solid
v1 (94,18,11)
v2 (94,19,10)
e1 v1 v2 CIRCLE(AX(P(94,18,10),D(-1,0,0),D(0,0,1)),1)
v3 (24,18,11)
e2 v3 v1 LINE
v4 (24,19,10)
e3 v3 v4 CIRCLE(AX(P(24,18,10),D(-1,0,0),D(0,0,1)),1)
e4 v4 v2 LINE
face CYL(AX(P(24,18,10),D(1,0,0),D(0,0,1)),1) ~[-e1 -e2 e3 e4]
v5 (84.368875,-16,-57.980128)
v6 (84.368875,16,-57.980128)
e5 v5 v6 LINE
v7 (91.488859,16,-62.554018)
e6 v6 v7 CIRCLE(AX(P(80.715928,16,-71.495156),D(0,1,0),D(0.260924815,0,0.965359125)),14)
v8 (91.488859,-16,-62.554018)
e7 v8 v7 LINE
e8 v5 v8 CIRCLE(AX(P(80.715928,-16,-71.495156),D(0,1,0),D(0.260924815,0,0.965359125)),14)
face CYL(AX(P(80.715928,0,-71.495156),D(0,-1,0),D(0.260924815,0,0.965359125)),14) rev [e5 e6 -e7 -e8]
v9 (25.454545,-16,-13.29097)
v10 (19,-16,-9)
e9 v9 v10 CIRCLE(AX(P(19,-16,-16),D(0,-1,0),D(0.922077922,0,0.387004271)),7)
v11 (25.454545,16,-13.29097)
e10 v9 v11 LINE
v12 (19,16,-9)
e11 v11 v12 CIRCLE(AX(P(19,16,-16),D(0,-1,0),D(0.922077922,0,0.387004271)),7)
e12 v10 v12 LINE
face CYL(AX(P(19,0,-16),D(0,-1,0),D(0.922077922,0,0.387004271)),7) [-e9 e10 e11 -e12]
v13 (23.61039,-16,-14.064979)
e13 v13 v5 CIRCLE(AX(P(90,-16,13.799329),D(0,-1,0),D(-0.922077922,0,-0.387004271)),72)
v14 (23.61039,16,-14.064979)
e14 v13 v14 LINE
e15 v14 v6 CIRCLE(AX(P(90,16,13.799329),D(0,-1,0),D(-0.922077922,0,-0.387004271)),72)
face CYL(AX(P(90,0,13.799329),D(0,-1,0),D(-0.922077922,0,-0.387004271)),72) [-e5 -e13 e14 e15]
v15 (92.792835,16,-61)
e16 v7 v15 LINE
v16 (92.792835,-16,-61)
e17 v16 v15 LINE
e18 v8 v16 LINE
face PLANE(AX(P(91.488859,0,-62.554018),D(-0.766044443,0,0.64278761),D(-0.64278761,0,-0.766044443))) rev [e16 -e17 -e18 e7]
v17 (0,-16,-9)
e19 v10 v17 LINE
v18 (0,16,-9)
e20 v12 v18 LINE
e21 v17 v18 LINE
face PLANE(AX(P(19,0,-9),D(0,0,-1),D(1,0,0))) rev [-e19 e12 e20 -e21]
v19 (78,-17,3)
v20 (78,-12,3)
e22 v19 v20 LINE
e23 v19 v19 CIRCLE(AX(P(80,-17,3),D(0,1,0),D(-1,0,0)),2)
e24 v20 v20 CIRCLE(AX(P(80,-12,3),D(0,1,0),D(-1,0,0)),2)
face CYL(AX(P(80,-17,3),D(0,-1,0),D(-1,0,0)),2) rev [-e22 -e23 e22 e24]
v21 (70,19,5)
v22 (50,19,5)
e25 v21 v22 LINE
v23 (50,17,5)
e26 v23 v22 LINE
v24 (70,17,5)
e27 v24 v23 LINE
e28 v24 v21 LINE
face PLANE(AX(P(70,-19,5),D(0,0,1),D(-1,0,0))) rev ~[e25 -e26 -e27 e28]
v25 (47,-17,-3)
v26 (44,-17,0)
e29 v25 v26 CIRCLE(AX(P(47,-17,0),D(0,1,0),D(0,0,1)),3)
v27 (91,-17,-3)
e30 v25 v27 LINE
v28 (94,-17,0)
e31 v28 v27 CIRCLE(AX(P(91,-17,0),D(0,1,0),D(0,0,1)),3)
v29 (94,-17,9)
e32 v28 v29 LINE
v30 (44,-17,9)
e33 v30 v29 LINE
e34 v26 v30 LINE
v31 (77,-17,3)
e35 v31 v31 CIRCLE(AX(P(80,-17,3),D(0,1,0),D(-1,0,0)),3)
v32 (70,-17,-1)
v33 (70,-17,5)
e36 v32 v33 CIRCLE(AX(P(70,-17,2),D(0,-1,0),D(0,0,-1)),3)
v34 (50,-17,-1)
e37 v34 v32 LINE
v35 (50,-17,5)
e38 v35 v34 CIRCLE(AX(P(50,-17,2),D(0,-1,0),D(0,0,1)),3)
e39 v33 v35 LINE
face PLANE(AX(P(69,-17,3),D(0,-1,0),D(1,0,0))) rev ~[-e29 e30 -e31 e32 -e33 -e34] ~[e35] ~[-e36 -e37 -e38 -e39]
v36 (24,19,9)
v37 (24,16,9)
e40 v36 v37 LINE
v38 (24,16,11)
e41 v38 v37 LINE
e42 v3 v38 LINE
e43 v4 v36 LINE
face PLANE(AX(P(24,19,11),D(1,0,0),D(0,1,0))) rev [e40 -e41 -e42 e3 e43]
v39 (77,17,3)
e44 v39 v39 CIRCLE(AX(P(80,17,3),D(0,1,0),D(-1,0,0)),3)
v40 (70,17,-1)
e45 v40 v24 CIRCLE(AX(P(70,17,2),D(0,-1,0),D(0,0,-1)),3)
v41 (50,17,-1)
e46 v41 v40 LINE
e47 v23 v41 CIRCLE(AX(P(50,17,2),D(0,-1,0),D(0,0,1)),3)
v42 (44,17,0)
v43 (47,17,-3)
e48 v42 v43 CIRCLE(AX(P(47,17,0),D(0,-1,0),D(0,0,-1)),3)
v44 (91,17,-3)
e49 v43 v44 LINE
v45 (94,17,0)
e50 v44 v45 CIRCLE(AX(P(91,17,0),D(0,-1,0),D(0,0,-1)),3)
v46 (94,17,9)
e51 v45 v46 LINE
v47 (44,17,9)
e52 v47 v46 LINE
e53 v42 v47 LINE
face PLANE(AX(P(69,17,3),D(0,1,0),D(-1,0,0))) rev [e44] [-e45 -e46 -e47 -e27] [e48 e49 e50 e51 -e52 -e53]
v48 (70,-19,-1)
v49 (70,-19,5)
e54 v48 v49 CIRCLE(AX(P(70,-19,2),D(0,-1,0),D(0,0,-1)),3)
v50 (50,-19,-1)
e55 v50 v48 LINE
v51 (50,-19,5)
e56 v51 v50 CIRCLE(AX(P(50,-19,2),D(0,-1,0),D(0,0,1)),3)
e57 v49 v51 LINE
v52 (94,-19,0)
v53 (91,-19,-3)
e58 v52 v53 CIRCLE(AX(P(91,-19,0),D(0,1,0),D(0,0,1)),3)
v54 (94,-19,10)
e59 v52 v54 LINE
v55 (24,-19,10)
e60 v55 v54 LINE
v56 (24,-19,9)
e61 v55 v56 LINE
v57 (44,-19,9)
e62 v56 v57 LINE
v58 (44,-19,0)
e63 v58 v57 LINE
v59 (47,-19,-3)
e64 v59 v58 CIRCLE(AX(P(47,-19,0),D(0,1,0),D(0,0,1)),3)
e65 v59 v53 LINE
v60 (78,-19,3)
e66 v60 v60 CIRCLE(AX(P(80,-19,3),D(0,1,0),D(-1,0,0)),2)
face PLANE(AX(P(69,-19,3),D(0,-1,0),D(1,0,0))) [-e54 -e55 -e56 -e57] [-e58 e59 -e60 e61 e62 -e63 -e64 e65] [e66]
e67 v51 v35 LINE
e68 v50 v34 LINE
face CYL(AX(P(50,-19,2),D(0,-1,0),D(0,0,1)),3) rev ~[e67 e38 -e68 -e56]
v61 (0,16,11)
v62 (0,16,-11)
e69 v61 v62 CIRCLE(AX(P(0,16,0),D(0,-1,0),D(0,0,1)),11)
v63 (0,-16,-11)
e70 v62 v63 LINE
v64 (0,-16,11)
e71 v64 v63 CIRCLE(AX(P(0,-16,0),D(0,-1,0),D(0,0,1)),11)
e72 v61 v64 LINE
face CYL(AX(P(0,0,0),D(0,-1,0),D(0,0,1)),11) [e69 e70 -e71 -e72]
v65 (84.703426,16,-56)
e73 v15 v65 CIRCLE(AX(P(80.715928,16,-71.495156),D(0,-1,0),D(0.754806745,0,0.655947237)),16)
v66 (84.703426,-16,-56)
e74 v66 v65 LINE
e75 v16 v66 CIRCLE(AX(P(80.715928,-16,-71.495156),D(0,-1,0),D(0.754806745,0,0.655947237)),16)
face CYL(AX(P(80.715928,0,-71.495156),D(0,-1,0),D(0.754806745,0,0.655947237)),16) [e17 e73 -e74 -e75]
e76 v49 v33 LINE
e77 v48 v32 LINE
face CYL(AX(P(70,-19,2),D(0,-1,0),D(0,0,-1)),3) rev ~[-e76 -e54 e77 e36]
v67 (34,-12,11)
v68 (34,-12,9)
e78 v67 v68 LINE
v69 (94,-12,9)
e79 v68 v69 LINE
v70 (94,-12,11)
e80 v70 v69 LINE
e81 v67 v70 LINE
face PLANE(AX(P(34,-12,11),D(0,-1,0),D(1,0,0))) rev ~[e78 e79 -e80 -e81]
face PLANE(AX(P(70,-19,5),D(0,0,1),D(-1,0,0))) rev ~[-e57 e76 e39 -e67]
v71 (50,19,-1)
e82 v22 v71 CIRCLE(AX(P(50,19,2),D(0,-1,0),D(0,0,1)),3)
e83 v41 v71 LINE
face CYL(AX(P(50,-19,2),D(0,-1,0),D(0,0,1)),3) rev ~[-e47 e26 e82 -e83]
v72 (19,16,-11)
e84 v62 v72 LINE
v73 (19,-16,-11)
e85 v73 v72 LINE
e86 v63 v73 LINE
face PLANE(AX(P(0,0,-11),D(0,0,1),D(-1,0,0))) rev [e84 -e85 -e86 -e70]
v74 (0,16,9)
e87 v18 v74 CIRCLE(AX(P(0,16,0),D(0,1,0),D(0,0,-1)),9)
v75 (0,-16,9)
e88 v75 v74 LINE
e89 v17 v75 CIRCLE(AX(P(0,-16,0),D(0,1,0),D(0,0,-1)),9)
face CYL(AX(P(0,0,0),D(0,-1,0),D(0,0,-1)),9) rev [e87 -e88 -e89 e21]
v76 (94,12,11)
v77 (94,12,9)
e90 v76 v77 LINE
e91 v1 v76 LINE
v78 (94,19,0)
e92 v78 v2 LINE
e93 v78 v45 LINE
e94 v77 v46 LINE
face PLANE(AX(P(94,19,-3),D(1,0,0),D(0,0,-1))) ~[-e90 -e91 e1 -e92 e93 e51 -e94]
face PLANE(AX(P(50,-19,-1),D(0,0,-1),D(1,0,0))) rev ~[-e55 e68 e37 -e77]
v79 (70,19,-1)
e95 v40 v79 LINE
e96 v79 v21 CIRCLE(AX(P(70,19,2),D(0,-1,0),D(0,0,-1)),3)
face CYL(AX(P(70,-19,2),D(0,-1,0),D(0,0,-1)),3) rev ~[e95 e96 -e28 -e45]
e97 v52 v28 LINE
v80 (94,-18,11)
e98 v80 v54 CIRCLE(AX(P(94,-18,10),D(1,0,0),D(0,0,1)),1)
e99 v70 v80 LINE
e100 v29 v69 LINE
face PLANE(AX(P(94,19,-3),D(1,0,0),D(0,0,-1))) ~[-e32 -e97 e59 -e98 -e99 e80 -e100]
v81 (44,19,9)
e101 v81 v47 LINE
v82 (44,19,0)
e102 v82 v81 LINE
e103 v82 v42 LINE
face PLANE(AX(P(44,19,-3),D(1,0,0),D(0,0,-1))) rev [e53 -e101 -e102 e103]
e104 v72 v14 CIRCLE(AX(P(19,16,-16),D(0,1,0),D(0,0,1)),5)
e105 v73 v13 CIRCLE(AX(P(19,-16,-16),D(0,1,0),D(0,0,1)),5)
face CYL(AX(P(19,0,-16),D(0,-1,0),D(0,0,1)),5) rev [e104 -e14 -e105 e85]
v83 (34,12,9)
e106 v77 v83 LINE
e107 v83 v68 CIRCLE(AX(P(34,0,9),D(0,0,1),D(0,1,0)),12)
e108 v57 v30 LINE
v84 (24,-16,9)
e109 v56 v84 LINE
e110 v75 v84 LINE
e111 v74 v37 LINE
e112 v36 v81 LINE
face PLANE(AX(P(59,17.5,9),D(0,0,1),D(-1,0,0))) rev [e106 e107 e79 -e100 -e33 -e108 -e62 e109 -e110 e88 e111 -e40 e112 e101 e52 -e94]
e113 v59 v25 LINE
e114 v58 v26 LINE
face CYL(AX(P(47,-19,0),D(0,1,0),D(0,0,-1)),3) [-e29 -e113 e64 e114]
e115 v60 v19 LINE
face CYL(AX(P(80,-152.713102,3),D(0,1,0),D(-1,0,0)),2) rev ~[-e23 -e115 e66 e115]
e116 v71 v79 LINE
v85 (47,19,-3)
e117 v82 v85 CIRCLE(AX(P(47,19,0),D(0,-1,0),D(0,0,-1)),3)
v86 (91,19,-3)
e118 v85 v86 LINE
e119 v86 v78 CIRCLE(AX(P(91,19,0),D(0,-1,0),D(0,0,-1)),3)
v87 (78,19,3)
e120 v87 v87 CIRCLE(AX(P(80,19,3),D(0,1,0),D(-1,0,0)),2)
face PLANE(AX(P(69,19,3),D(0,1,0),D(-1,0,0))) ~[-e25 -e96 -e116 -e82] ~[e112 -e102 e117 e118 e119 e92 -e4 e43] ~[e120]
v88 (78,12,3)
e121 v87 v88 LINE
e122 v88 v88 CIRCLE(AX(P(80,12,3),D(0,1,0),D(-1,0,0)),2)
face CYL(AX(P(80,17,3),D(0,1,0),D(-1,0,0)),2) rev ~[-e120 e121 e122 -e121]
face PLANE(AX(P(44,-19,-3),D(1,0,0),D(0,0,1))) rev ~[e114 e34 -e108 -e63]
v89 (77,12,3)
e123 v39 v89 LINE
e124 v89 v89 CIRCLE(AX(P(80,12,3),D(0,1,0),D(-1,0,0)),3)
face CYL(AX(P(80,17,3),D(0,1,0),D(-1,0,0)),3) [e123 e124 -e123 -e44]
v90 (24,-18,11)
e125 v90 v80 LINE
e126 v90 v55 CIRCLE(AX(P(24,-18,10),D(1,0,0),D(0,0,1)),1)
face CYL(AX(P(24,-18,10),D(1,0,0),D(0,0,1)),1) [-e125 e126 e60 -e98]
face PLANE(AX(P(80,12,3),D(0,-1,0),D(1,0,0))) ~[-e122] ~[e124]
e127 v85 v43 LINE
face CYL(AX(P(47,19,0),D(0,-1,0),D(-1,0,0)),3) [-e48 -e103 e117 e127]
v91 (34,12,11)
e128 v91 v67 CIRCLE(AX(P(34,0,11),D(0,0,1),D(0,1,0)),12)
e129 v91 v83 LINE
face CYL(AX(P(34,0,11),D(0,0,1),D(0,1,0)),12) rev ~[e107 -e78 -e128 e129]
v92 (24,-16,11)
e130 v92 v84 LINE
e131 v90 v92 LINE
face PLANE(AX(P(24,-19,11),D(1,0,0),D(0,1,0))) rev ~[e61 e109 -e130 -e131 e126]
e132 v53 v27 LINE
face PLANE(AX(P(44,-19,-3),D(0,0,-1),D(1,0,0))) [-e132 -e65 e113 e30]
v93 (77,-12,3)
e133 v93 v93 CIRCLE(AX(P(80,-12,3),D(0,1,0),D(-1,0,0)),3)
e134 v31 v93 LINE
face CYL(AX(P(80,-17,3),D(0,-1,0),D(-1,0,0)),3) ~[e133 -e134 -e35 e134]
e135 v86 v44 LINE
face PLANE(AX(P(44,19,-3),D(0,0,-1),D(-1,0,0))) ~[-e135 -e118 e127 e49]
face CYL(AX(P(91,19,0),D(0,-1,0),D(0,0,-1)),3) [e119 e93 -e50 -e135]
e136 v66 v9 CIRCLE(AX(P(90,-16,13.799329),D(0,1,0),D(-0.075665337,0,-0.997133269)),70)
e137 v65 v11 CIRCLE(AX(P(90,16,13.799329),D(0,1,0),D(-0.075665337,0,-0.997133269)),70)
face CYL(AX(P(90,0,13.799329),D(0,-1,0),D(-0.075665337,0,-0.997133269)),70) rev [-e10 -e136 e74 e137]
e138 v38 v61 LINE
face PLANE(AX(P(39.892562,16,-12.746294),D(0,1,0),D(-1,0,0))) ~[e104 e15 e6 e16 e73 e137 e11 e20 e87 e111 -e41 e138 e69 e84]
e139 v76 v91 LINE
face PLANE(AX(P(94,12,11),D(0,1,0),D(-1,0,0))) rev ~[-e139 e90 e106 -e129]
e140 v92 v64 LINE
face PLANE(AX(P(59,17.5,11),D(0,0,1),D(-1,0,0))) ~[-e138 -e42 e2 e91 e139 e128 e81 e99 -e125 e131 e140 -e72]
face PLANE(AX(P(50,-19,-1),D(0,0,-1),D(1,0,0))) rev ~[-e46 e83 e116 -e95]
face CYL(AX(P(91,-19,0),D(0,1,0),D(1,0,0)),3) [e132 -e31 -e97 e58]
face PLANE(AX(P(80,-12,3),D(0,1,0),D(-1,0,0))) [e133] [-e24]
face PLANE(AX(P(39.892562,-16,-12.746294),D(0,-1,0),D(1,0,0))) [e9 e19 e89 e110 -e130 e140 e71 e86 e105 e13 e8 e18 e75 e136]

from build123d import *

# Parameters (mm, degrees)
F1_DEPTH  = 16
F2_W      = 70
F2_H      = 3
F3_DEPTH  = 2
F4_W      = 50
F4_H      = 12
F5_DEPTH  = 2
F6_R      = 1
F9_DEPTH  = 2
F11_DEPTH = 38.001
F13_D     = 4
F14_R     = 3
F14_R_2   = 2
F15_DEPTH = 5
F16_R     = 3


# Not quite as in the source:
# - a pattern or mirror of a feature is missing from the dataset's text; its kind, count and spacing are read off the source's solid


with BuildPart() as f1:
    # F0 (on Front) → F1 (new body)
    with BuildSketch(Plane.XZ):
        with BuildLine():
            Line((94, 11), (0, 11))
            ThreePointArc((0, 11), (-11, 0), (0, -11))
            Line((0, -11), (19, -11))
            ThreePointArc((19, -11), (21.7681124643, -11.8361612201), (23.6103896104, -14.064978646))
            ThreePointArc((23.6103896104, -14.064978646), (47.8232093534, -44.5540629158), (84.3688749643, -57.9801280344))
            ThreePointArc((84.3688749643, -57.9801280344), (88.282737688, -59.7162176184), (91.4888593469, -62.5540182408))
            Line((91.4888593469, -62.5540182408), (92.7928354795, -61))
            ThreePointArc((92.7928354795, -61), (89.1281978331, -57.8850966861), (84.7034264019, -56))
            ThreePointArc((84.7034264019, -56), (49.0672193413, -42.9854179344), (25.4545454545, -13.2909701044))
            ThreePointArc((25.4545454545, -13.2909701044), (22.87535745, -10.1706257081), (19, -9))
            Line((19, -9), (0, -9))
            ThreePointArc((0, -9), (-9, 0), (0, 9))
            Line((0, 9), (94, 9))
            Line((94, 9), (94, 11))
        make_face()
    extrude(amount=F1_DEPTH)

    # F2 (on face) → F3 (join)
    with BuildSketch(Plane.XY.offset(11)):
        with Locations((59, -17.5)):
            Rectangle(F2_W, F2_H)
    extrude(amount=-F3_DEPTH)

    # F4 (on face) → F5 (join)
    with BuildSketch(Plane.XZ.offset(19)):
        with Locations((69, 3)):
            Rectangle(F4_W, F4_H)
    extrude(amount=-F5_DEPTH)

    # F6
    f6_edges = [f1.edges().sort_by_distance(p)[0] for p in [
        (59, -19, 11),
    ]]
    fillet(f6_edges, radius=F6_R)

    # F7: F1 across plane


with BuildPart() as f1_1:
    add(f1.part)
    add(f1.part.mirror(Plane.XZ))

    # F8 (on face) → F9 (cut)
    with BuildSketch(Plane.XY.offset(11)):
        with BuildLine():
            Line((94, 12), (34, 12))
            ThreePointArc((34, 12), (22, 0), (34, -12))
            Line((34, -12), (94, -12))
            Line((94, -12), (94, 12))
        make_face()
    extrude(amount=-F9_DEPTH, mode=Mode.SUBTRACT)

    # F10 (on face) → F11 (cut, through all)
    with BuildSketch(Plane.XZ.offset(19)):
        with BuildLine():
            ThreePointArc((50, 5), (47, 2), (50, -1))
            Line((50, -1), (70, -1))
            ThreePointArc((70, -1), (73, 2), (70, 5))
            Line((70, 5), (50, 5))
        make_face()
    extrude(amount=-F11_DEPTH, mode=Mode.SUBTRACT)

    # F13 (through all)
    with Locations(Plane.XZ.offset(19)):
        with Locations((80, 3)):
            Hole(F13_D / 2)

    # F14 (on face) → F15 (join)
    with BuildSketch(Plane(origin=(0, -17, 0), x_dir=(-1, 0, 0), z_dir=(0, 1, 0))):
        with Locations((-80, 3)):
            Circle(F14_R)
        with Locations((-80, 3)):
            Circle(F14_R_2, mode=Mode.SUBTRACT)
    f15 = extrude(amount=F15_DEPTH)

    # F15_copies: F15 across plane
    add(f15.mirror(Plane.ZX))

    # F16
    f16_edges = [f1_1.edges().sort_by_distance(p)[0] for p in [
        (94, 18, -3),
        (44, 18, -3),
        (94, -18, -3),
        (44, -18, -3),
    ]]
    fillet(f16_edges, radius=F16_R)


solid = f1_1.part
